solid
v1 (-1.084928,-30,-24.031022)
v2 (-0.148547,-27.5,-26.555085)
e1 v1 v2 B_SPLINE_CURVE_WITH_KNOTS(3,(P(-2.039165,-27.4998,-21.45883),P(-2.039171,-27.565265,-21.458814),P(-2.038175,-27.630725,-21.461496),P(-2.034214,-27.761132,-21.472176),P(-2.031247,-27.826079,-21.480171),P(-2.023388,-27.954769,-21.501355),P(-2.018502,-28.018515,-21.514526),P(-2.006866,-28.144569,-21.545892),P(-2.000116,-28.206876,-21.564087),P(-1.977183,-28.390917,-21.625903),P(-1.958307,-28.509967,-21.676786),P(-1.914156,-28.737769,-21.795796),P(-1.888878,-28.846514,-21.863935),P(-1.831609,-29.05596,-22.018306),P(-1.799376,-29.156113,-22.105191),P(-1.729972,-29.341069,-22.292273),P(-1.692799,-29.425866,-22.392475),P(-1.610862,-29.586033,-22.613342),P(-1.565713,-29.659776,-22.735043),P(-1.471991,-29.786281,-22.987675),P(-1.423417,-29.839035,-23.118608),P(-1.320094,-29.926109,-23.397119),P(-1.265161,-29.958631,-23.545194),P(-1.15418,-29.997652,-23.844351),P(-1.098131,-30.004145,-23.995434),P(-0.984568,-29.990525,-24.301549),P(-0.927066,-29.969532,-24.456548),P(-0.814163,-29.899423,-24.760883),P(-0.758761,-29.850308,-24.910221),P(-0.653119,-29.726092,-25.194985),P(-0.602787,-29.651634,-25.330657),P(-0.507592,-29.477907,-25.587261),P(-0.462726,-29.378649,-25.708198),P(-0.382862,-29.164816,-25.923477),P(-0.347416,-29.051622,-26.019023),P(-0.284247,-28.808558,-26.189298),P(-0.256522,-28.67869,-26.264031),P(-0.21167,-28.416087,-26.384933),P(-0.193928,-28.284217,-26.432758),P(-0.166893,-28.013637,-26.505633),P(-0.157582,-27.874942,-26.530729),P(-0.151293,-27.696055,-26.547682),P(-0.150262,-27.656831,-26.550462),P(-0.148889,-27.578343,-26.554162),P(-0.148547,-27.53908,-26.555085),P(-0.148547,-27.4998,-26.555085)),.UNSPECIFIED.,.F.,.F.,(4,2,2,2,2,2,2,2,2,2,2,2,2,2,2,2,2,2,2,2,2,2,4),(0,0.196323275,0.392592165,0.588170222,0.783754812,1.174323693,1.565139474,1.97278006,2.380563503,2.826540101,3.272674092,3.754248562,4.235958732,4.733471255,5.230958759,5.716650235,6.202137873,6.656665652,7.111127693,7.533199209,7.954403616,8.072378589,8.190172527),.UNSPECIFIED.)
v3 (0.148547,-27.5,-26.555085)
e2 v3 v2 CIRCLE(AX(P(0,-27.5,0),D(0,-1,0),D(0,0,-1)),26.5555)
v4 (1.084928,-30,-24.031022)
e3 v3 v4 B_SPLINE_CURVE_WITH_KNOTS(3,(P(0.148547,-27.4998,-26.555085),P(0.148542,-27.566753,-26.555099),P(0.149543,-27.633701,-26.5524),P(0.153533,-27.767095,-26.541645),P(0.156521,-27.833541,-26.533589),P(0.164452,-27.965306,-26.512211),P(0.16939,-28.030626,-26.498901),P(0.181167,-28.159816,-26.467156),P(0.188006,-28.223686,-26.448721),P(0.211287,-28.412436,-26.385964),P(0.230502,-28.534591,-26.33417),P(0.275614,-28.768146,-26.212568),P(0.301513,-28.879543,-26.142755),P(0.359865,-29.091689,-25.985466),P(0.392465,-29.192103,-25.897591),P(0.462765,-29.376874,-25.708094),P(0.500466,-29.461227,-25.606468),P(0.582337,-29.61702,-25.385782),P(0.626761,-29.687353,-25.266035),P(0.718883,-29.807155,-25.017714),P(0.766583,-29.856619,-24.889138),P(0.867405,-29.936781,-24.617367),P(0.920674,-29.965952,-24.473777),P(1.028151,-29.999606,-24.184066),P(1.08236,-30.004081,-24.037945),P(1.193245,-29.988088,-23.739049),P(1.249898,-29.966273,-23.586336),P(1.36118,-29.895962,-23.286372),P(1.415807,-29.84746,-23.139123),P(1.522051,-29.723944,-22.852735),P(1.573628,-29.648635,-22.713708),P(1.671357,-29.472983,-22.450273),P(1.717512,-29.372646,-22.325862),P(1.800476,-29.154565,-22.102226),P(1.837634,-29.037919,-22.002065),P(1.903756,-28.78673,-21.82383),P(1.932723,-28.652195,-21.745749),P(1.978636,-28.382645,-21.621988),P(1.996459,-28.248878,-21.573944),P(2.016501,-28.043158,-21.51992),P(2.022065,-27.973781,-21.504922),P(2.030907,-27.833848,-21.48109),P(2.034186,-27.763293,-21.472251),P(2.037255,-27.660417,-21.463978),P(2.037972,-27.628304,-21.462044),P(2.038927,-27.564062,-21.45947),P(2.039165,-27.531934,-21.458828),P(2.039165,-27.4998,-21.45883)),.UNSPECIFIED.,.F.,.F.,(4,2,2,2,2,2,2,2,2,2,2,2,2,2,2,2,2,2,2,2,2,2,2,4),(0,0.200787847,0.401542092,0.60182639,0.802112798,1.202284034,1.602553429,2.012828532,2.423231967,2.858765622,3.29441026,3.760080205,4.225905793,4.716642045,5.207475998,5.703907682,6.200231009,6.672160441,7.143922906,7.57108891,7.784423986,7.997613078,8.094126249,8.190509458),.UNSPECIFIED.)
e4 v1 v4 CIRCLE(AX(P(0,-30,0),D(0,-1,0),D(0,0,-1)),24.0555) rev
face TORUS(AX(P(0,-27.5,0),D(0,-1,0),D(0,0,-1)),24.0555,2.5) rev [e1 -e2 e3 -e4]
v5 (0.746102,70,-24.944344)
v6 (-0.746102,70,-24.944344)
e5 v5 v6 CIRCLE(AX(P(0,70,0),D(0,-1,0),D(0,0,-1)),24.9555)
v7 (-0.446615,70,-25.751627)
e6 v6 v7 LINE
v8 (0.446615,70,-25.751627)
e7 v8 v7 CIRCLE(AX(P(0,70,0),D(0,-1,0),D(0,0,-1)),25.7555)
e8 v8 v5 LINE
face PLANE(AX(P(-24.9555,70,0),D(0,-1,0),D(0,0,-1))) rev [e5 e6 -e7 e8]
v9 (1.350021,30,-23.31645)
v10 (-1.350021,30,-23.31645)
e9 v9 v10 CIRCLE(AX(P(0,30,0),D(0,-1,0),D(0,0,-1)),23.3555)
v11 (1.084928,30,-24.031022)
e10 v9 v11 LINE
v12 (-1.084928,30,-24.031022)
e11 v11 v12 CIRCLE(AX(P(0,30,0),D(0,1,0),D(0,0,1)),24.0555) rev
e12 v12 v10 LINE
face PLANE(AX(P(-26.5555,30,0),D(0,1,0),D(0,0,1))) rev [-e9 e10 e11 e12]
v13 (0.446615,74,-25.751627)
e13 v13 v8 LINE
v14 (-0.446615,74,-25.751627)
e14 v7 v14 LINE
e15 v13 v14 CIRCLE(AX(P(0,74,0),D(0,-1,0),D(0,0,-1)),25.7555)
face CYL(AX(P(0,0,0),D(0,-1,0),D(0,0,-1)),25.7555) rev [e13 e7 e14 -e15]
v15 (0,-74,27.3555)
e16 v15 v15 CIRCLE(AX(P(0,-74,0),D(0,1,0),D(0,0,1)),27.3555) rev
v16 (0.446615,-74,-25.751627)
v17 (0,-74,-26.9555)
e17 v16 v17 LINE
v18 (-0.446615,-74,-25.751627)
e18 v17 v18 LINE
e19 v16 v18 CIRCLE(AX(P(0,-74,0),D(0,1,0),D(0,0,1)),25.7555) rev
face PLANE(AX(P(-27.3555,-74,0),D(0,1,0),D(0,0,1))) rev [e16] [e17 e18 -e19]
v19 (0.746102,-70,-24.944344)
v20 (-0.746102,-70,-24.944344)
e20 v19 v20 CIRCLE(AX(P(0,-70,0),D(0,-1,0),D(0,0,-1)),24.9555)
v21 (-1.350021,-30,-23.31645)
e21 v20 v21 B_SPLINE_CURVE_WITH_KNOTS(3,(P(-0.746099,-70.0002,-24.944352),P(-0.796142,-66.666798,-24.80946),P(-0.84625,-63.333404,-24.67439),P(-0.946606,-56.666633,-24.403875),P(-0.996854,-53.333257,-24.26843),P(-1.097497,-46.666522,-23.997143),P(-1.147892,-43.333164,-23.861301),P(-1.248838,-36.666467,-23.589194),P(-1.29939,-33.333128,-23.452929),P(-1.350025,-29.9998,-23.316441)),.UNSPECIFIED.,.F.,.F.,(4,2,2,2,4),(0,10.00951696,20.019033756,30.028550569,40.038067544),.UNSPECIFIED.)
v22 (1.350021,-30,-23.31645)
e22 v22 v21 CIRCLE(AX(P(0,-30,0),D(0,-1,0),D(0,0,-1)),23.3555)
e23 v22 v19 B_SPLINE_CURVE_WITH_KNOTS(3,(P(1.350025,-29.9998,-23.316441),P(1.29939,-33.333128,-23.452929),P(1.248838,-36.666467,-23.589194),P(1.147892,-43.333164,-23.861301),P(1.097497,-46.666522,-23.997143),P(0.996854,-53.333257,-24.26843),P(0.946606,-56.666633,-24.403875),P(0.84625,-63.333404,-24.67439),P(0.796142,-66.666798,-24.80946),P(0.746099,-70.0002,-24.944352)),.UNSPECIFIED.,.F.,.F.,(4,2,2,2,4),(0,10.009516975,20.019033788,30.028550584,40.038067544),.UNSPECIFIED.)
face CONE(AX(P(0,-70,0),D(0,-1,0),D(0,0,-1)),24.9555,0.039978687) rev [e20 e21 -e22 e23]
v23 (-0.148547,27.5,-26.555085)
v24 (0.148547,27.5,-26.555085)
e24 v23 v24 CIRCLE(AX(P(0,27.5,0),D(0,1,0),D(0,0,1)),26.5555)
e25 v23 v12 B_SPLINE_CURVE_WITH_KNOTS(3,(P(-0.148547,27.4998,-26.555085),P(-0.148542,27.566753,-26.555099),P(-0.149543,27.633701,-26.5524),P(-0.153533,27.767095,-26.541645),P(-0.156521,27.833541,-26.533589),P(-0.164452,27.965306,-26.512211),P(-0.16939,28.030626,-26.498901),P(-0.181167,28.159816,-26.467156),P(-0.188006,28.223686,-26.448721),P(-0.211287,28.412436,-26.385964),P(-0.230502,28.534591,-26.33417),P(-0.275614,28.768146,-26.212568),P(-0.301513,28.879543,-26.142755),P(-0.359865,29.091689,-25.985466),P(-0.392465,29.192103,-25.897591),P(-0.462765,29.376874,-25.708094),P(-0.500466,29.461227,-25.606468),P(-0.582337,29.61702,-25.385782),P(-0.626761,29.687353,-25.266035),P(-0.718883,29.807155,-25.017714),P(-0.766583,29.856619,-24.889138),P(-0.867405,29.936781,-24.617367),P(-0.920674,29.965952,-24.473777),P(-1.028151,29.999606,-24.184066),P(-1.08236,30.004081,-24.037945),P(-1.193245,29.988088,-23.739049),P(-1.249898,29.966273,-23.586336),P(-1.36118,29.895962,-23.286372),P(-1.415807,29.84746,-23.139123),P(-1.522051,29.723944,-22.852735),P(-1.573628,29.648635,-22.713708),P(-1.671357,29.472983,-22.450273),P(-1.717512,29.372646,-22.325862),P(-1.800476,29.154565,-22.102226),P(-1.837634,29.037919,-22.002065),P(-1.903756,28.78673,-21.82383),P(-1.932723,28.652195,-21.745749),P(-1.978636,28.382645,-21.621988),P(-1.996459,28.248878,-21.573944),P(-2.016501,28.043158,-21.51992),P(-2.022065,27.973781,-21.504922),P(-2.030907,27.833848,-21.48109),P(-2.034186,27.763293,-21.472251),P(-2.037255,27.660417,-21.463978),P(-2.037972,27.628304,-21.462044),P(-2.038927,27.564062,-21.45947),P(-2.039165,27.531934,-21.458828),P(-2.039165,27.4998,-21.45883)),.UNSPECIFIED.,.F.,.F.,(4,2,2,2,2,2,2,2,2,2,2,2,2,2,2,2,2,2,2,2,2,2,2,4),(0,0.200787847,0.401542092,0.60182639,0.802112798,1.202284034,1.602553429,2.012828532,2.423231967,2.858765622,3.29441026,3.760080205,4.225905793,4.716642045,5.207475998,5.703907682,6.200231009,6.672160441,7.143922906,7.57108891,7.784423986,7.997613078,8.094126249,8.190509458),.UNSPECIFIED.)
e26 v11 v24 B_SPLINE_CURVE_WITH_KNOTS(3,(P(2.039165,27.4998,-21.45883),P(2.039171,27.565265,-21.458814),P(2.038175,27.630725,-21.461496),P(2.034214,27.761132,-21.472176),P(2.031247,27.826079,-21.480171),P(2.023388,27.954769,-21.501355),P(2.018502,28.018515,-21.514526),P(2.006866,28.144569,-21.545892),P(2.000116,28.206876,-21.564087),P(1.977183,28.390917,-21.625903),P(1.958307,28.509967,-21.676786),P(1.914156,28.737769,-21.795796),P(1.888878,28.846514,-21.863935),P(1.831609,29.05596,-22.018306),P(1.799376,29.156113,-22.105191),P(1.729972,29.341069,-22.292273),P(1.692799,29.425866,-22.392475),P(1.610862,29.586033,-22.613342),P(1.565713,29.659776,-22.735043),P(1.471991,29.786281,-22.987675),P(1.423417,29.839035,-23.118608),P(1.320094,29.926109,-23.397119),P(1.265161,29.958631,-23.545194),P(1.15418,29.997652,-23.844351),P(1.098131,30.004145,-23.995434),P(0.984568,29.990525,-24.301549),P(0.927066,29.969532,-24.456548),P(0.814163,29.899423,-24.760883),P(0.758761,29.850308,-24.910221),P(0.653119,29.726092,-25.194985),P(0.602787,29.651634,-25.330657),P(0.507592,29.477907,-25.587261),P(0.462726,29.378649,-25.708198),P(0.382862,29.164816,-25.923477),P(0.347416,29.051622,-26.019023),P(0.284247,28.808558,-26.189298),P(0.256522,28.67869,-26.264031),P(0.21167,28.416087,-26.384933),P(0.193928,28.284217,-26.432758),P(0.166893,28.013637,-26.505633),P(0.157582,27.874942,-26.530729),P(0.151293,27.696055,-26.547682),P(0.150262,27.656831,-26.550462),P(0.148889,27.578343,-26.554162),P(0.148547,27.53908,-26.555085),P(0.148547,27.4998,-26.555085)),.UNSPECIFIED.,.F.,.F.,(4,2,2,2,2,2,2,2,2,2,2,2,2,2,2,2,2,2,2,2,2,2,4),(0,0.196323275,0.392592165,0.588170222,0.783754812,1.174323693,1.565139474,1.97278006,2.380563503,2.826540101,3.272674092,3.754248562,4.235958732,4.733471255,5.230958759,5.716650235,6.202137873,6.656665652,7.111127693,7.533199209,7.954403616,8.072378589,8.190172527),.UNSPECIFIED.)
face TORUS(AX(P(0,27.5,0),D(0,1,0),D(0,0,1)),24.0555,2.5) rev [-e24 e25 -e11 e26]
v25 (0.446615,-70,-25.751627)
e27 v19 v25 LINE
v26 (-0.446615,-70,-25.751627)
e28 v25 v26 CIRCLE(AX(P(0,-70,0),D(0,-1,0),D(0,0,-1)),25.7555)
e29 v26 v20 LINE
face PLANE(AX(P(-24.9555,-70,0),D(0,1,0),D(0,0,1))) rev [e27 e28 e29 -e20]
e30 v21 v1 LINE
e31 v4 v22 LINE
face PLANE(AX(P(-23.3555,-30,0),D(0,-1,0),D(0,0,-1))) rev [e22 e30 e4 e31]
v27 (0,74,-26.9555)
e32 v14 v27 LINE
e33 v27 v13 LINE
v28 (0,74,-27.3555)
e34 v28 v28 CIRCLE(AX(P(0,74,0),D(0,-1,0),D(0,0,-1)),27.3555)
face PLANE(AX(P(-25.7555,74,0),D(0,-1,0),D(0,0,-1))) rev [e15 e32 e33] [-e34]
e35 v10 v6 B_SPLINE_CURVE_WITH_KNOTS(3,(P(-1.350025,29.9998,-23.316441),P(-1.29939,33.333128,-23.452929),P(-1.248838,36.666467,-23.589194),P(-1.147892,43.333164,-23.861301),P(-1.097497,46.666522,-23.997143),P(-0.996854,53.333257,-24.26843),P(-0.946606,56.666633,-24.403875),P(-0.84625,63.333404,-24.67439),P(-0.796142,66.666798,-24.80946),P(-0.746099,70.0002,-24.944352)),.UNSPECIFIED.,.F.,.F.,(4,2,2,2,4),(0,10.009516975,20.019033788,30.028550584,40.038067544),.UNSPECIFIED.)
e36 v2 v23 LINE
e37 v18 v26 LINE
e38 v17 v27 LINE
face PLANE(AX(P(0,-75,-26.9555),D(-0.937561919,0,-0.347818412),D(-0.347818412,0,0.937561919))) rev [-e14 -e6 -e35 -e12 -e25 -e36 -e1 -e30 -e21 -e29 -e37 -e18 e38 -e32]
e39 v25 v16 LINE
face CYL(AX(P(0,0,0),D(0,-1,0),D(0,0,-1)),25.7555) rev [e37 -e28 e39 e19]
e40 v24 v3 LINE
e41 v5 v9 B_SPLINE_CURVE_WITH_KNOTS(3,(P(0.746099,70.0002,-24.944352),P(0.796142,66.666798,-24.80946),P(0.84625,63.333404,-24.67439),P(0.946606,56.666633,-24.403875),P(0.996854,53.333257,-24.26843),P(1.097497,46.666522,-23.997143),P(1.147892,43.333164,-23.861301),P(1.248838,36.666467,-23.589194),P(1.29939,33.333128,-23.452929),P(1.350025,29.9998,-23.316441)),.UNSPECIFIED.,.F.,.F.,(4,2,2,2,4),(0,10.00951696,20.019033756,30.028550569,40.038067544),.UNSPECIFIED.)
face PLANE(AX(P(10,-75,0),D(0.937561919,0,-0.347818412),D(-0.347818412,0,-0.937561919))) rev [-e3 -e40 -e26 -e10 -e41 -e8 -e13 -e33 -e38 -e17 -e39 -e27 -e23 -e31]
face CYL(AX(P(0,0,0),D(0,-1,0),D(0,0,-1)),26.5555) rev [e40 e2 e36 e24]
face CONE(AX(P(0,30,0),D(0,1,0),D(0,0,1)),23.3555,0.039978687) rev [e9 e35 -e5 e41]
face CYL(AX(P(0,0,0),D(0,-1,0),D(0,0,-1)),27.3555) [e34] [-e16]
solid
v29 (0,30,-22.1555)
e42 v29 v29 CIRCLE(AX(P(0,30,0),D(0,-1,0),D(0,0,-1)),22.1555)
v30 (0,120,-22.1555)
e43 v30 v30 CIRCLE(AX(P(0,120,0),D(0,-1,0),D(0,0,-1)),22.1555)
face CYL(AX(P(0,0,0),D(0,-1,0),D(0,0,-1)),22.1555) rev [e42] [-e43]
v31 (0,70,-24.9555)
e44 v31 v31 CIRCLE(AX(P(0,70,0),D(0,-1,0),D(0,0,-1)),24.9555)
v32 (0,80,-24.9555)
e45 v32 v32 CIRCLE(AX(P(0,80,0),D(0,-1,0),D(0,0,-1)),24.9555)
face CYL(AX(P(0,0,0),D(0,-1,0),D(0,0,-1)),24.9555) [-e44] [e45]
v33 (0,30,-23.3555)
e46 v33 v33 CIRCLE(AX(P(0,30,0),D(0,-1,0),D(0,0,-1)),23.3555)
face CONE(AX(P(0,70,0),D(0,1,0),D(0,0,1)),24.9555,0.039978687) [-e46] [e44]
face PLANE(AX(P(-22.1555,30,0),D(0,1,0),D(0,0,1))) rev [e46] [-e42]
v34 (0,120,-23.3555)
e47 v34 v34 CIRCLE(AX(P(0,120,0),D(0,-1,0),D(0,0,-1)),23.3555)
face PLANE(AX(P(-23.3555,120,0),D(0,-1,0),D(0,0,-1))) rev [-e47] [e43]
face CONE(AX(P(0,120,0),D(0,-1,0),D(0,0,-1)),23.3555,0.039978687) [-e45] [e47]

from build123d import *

# Parameters (mm, degrees)
FILLET1_R               = 2.5
CUT_EXTRUDE1_DEPTH      = 199.800520021
CUT_EXTRUDE1_DEPTH_BACK = 199.800520021
MOVE_FACE1_BY           = 1
MOVE_START              = -75
MOVE_FACE2_OUTLINE_R    = 27.3555
MOVE_FACE2_DEPTH        = 1


# Read off the part's stored shape, not the designer's step: Move Face2
with BuildPart() as part:
    # Sketch1 → Revolve1 (revolve)
    with BuildSketch(Plane.XY, mode=Mode.PRIVATE) as revolve1_sk:
        Polygon((-27.3555, 75), (-27.3555, -75), (-25.7555, -75), (-25.7555, -70), (-24.9555, -70), (-23.3555, -30), (-26.5555, -30), (-26.5555, 30), (-23.3555, 30), (-24.9555, 70), (-25.7555, 70), (-25.7555, 75), align=None)
    revolve(revolve1_sk.sketch.rotate(Axis((0, 0, 0), (0, 1, 0)), 270), axis=Axis((0, 0, 0), (0, 1, 0)))

    # Fillet1
    fillet1_edges = [part.edges().sort_by_distance(p)[0] for p in [
        (0, 30, 26.5555),
        (0, -30, 26.5555),
    ]]
    fillet(fillet1_edges, radius=FILLET1_R)

    # Sketch3 → Cut-Extrude1 (cut, two sides: drawn at the far end of the back side and taken through both)
    with BuildSketch(Plane(origin=(0, 120, 0), x_dir=(1, 0, 0), z_dir=(0, 1, 0)).offset(-CUT_EXTRUDE1_DEPTH_BACK)):
        Polygon((0, 26.9555), (-10, 0), (10, 0), align=None)
    extrude(amount=CUT_EXTRUDE1_DEPTH + CUT_EXTRUDE1_DEPTH_BACK, mode=Mode.SUBTRACT)

    # Move Face1: a face moved inward by 1.0
    extrude(part.faces().sort_by_distance((21.8844, 75, -13.67775))[0], amount=MOVE_FACE1_BY, dir=(0, -1, 0), mode=Mode.SUBTRACT)

    # Move Face2 outline → Move Face2 (cut)
    with BuildSketch(Plane(origin=(0, 0, 0), x_dir=(1, 0, 0), z_dir=(0, 1, 0)).offset(MOVE_START)):
        Circle(MOVE_FACE2_OUTLINE_R)
        with BuildLine():
            Line((0, 26.9555), (0.446614816, 25.751627433))
            ThreePointArc((0.446614816, 25.751627433), (0, -25.7555), (-0.446614816, 25.751627433))
            Line((-0.446614816, 25.751627433), (0, 26.9555))
        make_face(mode=Mode.SUBTRACT)
    extrude(amount=MOVE_FACE2_DEPTH, mode=Mode.SUBTRACT)


with BuildPart() as body_2:
    # Sketch2 → Revolve2 (revolve)
    with BuildSketch(Plane.XY, mode=Mode.PRIVATE) as revolve2_sk:
        Polygon((-24.9555, 70), (-24.9555, 80), (-23.3555, 120), (-22.1555, 120), (-22.1555, 30), (-23.3555, 30), align=None)
    revolve(revolve2_sk.sketch.rotate(Axis((0, 0, 0), (0, 1, 0)), 270), axis=Axis((0, 0, 0), (0, 1, 0)))


solid = Compound([part.part, body_2.part])
